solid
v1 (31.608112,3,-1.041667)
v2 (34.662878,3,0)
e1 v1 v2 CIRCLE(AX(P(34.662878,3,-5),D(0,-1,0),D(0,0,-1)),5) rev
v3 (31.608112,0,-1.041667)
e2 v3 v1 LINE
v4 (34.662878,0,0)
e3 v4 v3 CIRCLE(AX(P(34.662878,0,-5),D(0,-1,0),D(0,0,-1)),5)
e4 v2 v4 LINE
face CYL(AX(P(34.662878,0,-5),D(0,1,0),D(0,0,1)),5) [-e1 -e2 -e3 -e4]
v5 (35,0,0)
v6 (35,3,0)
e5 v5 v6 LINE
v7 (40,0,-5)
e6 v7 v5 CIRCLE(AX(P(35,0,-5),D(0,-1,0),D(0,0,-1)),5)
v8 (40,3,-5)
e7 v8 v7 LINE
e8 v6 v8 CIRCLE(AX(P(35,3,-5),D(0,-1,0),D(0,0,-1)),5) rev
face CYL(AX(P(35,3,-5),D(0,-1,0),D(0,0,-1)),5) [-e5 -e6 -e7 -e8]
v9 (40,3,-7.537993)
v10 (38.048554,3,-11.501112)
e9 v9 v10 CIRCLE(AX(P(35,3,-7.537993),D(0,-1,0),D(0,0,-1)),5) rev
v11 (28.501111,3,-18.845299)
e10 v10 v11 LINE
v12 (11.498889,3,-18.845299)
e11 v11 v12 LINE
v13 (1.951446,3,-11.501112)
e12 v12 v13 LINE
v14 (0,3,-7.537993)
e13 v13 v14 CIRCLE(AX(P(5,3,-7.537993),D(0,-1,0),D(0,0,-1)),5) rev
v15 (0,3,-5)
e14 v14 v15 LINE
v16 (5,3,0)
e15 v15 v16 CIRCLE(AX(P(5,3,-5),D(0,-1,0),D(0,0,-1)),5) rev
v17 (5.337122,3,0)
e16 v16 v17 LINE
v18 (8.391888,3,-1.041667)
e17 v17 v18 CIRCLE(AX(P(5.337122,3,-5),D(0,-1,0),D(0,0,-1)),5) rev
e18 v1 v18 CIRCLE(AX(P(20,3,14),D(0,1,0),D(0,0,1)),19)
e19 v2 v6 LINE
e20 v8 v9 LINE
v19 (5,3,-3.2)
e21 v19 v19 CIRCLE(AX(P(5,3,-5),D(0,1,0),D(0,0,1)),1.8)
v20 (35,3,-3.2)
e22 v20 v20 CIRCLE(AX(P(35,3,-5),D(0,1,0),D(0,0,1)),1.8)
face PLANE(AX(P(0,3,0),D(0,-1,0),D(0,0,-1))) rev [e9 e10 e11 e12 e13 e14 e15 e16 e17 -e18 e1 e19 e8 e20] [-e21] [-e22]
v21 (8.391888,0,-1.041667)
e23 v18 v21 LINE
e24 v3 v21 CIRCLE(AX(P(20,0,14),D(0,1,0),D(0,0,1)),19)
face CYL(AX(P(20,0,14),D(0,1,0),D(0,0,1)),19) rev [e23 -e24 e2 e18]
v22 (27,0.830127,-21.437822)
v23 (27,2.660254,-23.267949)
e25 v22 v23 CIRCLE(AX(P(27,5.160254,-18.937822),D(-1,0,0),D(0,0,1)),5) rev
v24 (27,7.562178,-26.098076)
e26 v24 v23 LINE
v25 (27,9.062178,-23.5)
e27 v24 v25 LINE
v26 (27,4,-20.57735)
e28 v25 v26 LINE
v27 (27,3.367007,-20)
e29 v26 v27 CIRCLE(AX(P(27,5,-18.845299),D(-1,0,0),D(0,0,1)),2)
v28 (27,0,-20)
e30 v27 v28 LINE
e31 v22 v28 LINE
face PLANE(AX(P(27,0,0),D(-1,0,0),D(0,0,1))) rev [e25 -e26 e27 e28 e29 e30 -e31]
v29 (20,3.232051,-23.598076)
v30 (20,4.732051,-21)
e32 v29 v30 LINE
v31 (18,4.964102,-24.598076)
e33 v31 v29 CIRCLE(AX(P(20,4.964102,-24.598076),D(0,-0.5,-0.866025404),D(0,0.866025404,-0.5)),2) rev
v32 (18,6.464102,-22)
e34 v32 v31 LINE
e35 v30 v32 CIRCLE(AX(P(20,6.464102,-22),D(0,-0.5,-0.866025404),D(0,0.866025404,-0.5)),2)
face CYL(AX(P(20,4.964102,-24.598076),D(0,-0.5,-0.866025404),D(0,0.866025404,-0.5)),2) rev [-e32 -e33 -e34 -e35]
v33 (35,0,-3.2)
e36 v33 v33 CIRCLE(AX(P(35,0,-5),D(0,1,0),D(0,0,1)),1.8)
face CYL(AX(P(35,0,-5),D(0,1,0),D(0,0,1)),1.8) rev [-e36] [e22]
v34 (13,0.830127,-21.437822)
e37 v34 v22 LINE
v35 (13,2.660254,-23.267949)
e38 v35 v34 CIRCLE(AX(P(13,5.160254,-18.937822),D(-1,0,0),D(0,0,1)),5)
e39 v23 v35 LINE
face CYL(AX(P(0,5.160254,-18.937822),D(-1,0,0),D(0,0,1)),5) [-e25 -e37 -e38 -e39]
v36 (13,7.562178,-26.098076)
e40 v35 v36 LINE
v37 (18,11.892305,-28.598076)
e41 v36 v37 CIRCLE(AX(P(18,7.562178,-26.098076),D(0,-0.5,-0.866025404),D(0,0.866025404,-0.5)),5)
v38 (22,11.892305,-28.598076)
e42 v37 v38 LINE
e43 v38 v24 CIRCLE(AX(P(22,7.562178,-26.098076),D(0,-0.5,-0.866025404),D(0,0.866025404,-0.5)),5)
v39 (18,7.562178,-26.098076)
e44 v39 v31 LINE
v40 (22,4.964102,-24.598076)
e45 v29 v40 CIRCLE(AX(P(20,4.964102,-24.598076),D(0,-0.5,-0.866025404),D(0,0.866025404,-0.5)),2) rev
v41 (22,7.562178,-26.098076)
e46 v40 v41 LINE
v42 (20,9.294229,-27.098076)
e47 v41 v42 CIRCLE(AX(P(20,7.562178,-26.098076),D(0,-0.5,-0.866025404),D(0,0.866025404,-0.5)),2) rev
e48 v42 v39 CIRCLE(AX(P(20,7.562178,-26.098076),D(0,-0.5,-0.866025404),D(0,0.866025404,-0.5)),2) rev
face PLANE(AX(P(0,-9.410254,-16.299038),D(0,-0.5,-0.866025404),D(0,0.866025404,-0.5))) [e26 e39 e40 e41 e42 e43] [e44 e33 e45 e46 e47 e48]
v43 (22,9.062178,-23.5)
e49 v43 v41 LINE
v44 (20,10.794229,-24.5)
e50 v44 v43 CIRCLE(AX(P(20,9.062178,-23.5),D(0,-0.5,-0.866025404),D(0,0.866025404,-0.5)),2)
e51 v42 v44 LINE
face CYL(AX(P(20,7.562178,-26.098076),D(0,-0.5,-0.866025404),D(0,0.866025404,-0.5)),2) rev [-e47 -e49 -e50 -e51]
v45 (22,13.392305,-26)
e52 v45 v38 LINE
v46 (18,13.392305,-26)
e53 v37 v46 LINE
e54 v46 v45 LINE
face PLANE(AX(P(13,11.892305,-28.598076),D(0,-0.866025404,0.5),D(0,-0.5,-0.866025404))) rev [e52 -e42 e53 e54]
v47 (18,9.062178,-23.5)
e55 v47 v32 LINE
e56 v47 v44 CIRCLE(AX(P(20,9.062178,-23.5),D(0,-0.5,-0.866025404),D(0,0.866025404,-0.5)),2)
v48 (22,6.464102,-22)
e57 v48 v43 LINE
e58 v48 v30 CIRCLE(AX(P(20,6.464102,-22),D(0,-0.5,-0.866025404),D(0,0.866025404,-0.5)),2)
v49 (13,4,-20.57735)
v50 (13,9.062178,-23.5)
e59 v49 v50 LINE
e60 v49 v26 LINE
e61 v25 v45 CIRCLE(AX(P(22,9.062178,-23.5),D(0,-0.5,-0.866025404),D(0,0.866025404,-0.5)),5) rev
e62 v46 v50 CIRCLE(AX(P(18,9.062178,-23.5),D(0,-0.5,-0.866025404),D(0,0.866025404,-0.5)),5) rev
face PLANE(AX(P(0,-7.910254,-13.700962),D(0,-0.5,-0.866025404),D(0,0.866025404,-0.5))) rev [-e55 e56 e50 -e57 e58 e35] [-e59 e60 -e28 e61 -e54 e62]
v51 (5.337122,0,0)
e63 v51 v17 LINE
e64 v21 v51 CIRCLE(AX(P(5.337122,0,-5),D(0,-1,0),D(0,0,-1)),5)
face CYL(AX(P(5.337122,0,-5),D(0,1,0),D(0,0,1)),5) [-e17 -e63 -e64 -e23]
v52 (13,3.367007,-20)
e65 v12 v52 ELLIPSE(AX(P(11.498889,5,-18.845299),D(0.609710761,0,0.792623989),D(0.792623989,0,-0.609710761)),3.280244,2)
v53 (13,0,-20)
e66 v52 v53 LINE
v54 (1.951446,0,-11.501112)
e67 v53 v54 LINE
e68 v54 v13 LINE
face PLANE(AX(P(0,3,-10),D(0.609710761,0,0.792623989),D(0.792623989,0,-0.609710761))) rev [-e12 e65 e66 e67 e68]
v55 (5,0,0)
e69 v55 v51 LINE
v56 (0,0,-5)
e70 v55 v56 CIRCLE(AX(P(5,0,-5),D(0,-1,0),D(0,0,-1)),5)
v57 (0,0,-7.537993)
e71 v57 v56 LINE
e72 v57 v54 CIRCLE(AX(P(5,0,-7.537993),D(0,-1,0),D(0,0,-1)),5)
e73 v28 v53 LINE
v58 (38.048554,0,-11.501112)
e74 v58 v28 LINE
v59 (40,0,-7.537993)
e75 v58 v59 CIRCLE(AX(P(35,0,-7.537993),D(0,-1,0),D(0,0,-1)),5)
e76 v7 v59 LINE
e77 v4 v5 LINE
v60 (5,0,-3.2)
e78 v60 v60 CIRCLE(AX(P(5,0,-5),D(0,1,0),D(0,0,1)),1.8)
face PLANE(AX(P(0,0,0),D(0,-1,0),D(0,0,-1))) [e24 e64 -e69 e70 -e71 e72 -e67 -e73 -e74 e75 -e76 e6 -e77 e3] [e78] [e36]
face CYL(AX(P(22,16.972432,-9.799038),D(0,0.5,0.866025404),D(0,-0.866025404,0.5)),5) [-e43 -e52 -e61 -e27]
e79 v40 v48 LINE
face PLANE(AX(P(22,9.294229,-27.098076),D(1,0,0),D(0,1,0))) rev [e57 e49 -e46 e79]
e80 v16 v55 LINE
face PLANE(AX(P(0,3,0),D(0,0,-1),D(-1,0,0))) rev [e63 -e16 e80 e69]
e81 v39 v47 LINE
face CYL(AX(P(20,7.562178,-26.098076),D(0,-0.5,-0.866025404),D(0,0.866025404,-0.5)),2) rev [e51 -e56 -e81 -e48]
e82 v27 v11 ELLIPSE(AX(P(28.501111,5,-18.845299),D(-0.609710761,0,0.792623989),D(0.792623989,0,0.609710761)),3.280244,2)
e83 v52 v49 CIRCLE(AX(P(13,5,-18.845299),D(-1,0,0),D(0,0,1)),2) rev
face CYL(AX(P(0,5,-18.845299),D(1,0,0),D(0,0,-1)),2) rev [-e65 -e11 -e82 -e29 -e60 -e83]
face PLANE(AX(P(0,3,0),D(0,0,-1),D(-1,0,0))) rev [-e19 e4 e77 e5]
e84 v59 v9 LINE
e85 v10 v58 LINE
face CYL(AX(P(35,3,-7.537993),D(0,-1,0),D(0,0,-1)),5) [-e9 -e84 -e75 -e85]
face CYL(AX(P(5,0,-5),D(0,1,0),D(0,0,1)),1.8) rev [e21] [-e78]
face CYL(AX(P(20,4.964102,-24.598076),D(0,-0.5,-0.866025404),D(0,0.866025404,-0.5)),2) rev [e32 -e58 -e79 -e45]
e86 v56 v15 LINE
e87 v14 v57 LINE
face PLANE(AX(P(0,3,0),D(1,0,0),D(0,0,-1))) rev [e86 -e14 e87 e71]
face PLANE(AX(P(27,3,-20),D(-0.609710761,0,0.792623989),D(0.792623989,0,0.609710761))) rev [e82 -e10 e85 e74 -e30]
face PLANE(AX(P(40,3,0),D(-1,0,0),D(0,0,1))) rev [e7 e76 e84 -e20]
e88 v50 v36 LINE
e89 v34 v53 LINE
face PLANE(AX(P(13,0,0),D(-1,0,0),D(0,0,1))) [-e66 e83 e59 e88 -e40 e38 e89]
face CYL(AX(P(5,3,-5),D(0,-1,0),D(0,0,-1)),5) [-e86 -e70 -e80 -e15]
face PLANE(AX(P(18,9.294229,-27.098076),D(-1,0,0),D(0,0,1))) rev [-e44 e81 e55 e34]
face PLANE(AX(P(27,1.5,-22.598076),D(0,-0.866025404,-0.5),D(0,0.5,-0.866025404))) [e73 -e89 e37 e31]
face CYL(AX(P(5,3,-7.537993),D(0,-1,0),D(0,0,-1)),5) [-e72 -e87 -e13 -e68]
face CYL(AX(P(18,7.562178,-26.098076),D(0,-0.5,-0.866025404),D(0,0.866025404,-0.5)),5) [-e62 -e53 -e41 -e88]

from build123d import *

# Parameters (mm, degrees)
BOSS_EXTRUDE1_DEPTH = 3
SKETCH3_R           = 1.8
CUT_EXTRUDE1_DEPTH  = 3
SKETCH4_W           = 14
SKETCH4_H           = 12
BOSS_EXTRUDE2_DEPTH = 3
BOSS_EXTRUDE3_DEPTH = 14
SKETCH6_W           = 4
SKETCH6_H           = 7
CUT_EXTRUDE2_DEPTH  = 3
FILLET1_R           = 2
FILLET2_R           = 5
FILLET3_R           = 5
FILLET4_R           = 5
SKETCH7_R           = 19
CUT_EXTRUDE3_DEPTH  = 3
FILLET5_R           = 5
FILLET7_R           = 2


with BuildPart() as part:
    # Sketch2 → Boss-Extrude1 (new body)
    with BuildSketch(Plane(origin=(0, 0, 0), x_dir=(1, 0, 0), z_dir=(0, 1, 0))):
        Polygon((0, 10), (13, 20), (27, 20), (40, 10), (40, 0), (0, 0), align=None)
    extrude(amount=BOSS_EXTRUDE1_DEPTH)

    # Sketch3 → Cut-Extrude1 (cut)
    with BuildSketch(Plane(origin=(0, 3, 0), x_dir=(1, 0, 0), z_dir=(0, 1, 0))):
        with Locations(Location((5, 5, 0), (0, 0, 270))):
            Circle(SKETCH3_R)
        with Locations(Location((35, 5, 0), (0, 0, 270))):
            Circle(SKETCH3_R)
    extrude(amount=-CUT_EXTRUDE1_DEPTH, mode=Mode.SUBTRACT)



with BuildPart() as body_2:
    # Sketch4 → Boss-Extrude2 (new body)
    with BuildSketch(Plane(origin=(0, -7.910254038, -13.700961894), x_dir=(-1, 0, 0), z_dir=(0, -0.5000000000000041, -0.8660254037844364))):
        with Locations((-20, 18.598076211)):
            Rectangle(SKETCH4_W, SKETCH4_H)
    extrude(amount=BOSS_EXTRUDE2_DEPTH)


with BuildPart() as part_1:
    add(part.part)

    add(body_2.part)  # Boss-Extrude3 merges body 2
    # Sketch5 → Boss-Extrude3 (add)
    with BuildSketch(Plane.ZY.offset(-13)):
        Polygon((-22.598076211, 1.5), (-20, 0), (-20, 3), align=None)
    extrude(amount=-BOSS_EXTRUDE3_DEPTH)

    # Sketch6 → Cut-Extrude2 (cut)
    with BuildSketch(Plane(origin=(0, -7.910254038, -13.700961894), x_dir=(1, 0, 0), z_dir=(0, 0.5000000000000042, 0.8660254037844363))):
        with Locations((20, 18.098076211)):
            Rectangle(SKETCH6_W, SKETCH6_H)
    extrude(amount=-CUT_EXTRUDE2_DEPTH, mode=Mode.SUBTRACT)

    # Fillet1
    fillet1_edges = [part_1.edges().sort_by_distance(p)[0] for p in [
        (22, 3.982050808, -22.299038106),
        (18, 3.982050808, -22.299038106),
        (18, 10.044228634, -25.799038106),
        (22, 10.044228634, -25.799038106),
    ]]
    fillet(fillet1_edges, radius=FILLET1_R - 0.0001)  # a hair under: the kernel refuses the full size

    # Fillet2
    fillet2_edges = [part_1.edges().sort_by_distance(p)[0] for p in [
        (13, 12.642304845, -27.299038106),
        (27, 12.642304845, -27.299038106),
    ]]
    fillet(fillet2_edges, radius=FILLET2_R)

    # Fillet3
    fillet3_edges = [part_1.edges().sort_by_distance(p)[0] for p in [
        (0, 1.5, -10),
        (40, 1.5, -10),
        (40, 1.5, 0),
        (0, 1.5, 0),
    ]]
    fillet(fillet3_edges, radius=FILLET3_R)

    # Fillet4
    fillet4_edges = [part_1.edges().sort_by_distance(p)[0] for p in [
        (20, 1.5, -22.598076211),
    ]]
    fillet(fillet4_edges, radius=FILLET4_R)

    # Sketch7 → Cut-Extrude3 (cut)
    with BuildSketch(Plane(origin=(0, 3, 0), x_dir=(1, 0, 0), z_dir=(0, 1, 0))):
        with Locations((20, -14)):
            Circle(SKETCH7_R)
    extrude(amount=-CUT_EXTRUDE3_DEPTH, mode=Mode.SUBTRACT)

    # Fillet5
    fillet5_edges = [part_1.edges().sort_by_distance(p)[0] for p in [
        (7.154767421, 1.5, 0),
        (32.845232579, 1.5, 0),
    ]]
    fillet(fillet5_edges, radius=FILLET5_R)

    # Fillet7
    fillet7_edges = [part_1.edges().sort_by_distance(p)[0] for p in [
        (20, 3, -20),
    ]]
    fillet(fillet7_edges, radius=FILLET7_R)


solid = part_1.part
